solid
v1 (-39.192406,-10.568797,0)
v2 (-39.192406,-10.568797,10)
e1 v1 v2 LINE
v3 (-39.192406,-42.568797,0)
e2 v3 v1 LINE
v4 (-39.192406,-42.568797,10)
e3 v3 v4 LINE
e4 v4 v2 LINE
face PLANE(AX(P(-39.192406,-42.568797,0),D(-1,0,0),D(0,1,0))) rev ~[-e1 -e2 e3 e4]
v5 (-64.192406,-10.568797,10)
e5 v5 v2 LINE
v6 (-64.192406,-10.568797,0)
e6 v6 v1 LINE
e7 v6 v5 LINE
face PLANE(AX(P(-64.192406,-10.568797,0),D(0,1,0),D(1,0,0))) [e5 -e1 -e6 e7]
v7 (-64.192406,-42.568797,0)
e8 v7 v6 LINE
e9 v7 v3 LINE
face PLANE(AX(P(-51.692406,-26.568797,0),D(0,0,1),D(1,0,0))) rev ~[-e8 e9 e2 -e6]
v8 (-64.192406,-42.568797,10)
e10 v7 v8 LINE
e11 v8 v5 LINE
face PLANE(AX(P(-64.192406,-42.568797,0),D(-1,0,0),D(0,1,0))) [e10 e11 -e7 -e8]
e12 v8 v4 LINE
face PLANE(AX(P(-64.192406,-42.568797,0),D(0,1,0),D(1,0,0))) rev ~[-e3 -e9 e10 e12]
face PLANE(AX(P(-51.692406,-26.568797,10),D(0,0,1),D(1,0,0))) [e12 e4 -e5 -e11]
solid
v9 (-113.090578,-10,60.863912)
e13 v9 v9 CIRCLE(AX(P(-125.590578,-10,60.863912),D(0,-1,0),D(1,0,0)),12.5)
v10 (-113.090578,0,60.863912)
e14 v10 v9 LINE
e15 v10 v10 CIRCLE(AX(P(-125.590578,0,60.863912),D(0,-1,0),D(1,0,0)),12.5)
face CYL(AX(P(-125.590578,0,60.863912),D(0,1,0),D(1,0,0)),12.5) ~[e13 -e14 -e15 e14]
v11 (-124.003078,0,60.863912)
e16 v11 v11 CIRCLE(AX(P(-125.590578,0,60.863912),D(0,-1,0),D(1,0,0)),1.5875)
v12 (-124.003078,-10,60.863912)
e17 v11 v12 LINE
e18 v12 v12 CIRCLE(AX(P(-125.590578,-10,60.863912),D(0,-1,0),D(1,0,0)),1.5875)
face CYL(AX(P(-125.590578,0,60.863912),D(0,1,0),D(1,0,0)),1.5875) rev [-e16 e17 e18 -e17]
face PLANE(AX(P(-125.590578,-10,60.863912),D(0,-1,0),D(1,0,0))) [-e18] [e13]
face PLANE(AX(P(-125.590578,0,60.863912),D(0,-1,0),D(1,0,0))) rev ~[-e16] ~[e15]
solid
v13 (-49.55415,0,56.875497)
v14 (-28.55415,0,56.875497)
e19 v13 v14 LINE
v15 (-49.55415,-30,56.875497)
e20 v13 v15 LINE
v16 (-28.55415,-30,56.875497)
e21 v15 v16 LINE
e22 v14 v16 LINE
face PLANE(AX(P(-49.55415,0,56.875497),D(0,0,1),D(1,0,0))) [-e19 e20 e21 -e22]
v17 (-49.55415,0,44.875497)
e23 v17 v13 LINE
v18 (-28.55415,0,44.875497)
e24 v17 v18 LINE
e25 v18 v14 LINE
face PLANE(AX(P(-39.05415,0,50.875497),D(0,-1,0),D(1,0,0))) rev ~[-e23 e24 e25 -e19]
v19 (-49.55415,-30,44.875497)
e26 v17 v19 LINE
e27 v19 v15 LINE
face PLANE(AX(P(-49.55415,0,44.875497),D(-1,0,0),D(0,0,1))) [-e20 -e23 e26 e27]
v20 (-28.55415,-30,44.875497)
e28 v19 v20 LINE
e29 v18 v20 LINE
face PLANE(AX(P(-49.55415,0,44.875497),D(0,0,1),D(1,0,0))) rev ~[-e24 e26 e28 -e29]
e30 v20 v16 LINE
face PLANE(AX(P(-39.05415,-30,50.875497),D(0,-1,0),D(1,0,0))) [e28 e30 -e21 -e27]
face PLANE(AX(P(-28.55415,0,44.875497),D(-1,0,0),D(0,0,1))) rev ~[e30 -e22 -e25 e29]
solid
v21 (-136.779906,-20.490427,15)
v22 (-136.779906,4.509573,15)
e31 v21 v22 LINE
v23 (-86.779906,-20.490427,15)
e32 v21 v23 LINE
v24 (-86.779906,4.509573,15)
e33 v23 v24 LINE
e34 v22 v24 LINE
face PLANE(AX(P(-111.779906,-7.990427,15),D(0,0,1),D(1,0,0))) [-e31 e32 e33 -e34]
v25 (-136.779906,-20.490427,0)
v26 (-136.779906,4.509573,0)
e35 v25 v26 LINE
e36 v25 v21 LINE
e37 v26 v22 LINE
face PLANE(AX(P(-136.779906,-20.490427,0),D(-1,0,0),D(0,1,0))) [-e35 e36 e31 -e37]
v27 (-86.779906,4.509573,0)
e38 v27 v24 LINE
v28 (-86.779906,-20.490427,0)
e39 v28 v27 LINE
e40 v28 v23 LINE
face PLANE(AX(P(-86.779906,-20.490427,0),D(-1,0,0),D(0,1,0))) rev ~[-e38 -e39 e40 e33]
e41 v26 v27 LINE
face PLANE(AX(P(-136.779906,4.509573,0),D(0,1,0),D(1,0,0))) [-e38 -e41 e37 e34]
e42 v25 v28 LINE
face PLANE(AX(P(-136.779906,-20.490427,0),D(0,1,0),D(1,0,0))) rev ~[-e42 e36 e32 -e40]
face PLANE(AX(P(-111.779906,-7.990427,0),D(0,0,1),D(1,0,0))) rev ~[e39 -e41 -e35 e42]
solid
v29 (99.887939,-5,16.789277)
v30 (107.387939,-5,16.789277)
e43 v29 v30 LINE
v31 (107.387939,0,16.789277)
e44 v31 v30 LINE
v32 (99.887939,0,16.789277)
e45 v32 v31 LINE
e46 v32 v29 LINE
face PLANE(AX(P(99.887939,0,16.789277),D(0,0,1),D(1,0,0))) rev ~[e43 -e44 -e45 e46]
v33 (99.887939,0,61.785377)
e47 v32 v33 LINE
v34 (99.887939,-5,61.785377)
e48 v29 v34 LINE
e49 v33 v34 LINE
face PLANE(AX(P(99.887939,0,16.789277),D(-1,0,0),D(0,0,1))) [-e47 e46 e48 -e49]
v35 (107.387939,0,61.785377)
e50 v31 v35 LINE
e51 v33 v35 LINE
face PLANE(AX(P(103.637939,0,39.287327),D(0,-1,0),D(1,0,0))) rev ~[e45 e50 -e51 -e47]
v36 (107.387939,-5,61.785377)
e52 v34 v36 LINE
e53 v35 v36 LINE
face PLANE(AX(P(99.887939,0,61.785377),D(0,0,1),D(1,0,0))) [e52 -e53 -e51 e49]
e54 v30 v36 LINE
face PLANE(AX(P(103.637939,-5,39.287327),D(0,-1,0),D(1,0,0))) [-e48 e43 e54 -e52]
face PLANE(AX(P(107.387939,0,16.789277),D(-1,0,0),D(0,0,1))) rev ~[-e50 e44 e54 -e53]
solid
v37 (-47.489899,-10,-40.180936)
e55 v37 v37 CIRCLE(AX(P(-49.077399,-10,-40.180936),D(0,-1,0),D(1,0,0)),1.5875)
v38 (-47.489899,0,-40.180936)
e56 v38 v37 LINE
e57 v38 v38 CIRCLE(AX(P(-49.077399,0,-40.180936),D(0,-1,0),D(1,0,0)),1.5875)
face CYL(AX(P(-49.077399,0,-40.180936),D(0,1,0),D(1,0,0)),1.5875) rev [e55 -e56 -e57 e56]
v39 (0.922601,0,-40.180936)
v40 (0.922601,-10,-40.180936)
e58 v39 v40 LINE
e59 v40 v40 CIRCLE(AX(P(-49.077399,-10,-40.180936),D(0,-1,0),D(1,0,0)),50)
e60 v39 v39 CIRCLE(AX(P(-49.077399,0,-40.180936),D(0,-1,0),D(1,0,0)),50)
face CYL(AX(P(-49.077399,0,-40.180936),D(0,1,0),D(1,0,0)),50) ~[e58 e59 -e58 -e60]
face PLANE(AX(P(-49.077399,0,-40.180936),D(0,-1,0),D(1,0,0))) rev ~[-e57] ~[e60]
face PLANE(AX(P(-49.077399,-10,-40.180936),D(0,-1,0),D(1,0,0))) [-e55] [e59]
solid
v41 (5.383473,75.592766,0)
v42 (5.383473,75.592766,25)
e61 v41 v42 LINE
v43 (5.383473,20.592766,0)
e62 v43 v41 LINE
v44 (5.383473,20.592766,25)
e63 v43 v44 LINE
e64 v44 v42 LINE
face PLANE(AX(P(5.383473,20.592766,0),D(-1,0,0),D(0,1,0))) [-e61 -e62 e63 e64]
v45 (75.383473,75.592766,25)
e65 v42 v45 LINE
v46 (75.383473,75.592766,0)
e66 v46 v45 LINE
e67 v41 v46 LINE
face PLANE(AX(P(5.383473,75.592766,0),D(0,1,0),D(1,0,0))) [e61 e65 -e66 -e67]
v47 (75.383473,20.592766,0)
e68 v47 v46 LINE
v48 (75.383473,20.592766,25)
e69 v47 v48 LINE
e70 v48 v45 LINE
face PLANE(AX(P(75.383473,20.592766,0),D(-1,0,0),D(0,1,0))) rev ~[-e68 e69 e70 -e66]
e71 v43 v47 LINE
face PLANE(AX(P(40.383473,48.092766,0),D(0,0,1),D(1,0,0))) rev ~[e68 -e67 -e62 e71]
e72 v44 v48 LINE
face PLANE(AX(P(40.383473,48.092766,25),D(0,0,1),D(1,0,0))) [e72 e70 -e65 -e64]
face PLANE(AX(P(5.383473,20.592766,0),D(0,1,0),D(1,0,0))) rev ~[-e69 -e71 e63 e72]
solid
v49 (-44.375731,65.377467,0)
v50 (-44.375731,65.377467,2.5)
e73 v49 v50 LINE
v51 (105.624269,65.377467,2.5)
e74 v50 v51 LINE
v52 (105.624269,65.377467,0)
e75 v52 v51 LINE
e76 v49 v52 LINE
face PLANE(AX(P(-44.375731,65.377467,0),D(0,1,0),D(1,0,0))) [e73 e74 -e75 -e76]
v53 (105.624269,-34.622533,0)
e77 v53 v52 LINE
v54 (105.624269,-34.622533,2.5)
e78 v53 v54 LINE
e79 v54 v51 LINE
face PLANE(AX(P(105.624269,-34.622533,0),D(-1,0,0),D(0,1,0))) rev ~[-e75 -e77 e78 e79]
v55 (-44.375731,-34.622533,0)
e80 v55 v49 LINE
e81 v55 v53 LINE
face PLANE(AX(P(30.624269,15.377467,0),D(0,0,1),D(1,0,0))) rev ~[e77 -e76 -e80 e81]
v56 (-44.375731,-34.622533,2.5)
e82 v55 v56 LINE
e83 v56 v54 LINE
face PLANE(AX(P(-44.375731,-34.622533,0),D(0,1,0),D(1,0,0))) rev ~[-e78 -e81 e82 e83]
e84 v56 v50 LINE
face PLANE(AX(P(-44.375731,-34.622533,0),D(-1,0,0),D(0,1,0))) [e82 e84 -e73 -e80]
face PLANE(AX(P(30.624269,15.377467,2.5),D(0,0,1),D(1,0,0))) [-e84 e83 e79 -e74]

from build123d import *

# Parameters (mm, degrees)
F0_W      = 50
F0_H      = 25
F1_DEPTH  = 15
F2_W      = 70
F2_H      = 55
F3_DEPTH  = 25
F4_W      = 21
F4_H      = 12
F5_DEPTH  = 30
F6_W      = 25
F6_H      = 32
F7_DEPTH  = 10
F8_W      = 150
F8_H      = 100
F9_DEPTH  = 2.5
F10_R     = 50
F10_R_2   = 1.5875
F11_DEPTH = 10
F12_R     = 12.5
F12_R_2   = 1.5875
F13_DEPTH = 10
F14_W     = 7.5
F14_H     = 44.9961
F15_DEPTH = 5


# Not quite as in the source:
# - a feature names something its author has since deleted; it is built from what else it names


with BuildPart() as f1:
    # F0 (on Top) → F1 (new body)
    with BuildSketch(Plane.XY):
        with Locations((-111.7799058557, -7.9904274056)):
            Rectangle(F0_W, F0_H)
    extrude(amount=F1_DEPTH)


with BuildPart() as f3:
    # F2 (on Top) → F3 (new body)
    with BuildSketch(Plane.XY):
        with Locations((40.3834730387, 48.0927660437)):
            Rectangle(F2_W, F2_H)
    extrude(amount=F3_DEPTH)


with BuildPart() as f5:
    # F4 (on Front) → F5 (new body)
    with BuildSketch(Plane.XZ):
        with Locations((-39.0541495681, 50.8754973734)):
            Rectangle(F4_W, F4_H)
    extrude(amount=F5_DEPTH)


with BuildPart() as f7:
    # F6 (on Top) → F7 (new body)
    with BuildSketch(Plane.XY):
        with Locations((-51.6924057156, -26.56879695)):
            Rectangle(F6_W, F6_H)
    extrude(amount=F7_DEPTH)


with BuildPart() as f9:
    # F8 (on Top) → F9 (new body)
    with BuildSketch(Plane.XY):
        with Locations((30.6242685765, 15.3774665831)):
            Rectangle(F8_W, F8_H)
    extrude(amount=F9_DEPTH)


with BuildPart() as f11:
    # F10 (on Front) → F11 (new body)
    with BuildSketch(Plane.XZ):
        with Locations((-49.077399075, -40.1809364557)):
            Circle(F10_R)
        with Locations((-49.077399075, -40.1809364557)):
            Circle(F10_R_2, mode=Mode.SUBTRACT)
    extrude(amount=F11_DEPTH)


with BuildPart() as f13:
    # F12 (on Front) → F13 (new body)
    with BuildSketch(Plane.XZ):
        with Locations((-125.5905777216, 60.8639121056)):
            Circle(F12_R)
        with Locations((-125.5905777216, 60.8639121056)):
            Circle(F12_R_2, mode=Mode.SUBTRACT)
    extrude(amount=F13_DEPTH)


with BuildPart() as f15:
    # F14 (on Front) → F15 (new body)
    with BuildSketch(Plane.XZ):
        with Locations((103.637938503, 39.2873273231)):
            Rectangle(F14_W, F14_H)
    extrude(amount=F15_DEPTH)


solid = Compound([f1.part, f3.part, f5.part, f7.part, f9.part, f11.part, f13.part, f15.part])
